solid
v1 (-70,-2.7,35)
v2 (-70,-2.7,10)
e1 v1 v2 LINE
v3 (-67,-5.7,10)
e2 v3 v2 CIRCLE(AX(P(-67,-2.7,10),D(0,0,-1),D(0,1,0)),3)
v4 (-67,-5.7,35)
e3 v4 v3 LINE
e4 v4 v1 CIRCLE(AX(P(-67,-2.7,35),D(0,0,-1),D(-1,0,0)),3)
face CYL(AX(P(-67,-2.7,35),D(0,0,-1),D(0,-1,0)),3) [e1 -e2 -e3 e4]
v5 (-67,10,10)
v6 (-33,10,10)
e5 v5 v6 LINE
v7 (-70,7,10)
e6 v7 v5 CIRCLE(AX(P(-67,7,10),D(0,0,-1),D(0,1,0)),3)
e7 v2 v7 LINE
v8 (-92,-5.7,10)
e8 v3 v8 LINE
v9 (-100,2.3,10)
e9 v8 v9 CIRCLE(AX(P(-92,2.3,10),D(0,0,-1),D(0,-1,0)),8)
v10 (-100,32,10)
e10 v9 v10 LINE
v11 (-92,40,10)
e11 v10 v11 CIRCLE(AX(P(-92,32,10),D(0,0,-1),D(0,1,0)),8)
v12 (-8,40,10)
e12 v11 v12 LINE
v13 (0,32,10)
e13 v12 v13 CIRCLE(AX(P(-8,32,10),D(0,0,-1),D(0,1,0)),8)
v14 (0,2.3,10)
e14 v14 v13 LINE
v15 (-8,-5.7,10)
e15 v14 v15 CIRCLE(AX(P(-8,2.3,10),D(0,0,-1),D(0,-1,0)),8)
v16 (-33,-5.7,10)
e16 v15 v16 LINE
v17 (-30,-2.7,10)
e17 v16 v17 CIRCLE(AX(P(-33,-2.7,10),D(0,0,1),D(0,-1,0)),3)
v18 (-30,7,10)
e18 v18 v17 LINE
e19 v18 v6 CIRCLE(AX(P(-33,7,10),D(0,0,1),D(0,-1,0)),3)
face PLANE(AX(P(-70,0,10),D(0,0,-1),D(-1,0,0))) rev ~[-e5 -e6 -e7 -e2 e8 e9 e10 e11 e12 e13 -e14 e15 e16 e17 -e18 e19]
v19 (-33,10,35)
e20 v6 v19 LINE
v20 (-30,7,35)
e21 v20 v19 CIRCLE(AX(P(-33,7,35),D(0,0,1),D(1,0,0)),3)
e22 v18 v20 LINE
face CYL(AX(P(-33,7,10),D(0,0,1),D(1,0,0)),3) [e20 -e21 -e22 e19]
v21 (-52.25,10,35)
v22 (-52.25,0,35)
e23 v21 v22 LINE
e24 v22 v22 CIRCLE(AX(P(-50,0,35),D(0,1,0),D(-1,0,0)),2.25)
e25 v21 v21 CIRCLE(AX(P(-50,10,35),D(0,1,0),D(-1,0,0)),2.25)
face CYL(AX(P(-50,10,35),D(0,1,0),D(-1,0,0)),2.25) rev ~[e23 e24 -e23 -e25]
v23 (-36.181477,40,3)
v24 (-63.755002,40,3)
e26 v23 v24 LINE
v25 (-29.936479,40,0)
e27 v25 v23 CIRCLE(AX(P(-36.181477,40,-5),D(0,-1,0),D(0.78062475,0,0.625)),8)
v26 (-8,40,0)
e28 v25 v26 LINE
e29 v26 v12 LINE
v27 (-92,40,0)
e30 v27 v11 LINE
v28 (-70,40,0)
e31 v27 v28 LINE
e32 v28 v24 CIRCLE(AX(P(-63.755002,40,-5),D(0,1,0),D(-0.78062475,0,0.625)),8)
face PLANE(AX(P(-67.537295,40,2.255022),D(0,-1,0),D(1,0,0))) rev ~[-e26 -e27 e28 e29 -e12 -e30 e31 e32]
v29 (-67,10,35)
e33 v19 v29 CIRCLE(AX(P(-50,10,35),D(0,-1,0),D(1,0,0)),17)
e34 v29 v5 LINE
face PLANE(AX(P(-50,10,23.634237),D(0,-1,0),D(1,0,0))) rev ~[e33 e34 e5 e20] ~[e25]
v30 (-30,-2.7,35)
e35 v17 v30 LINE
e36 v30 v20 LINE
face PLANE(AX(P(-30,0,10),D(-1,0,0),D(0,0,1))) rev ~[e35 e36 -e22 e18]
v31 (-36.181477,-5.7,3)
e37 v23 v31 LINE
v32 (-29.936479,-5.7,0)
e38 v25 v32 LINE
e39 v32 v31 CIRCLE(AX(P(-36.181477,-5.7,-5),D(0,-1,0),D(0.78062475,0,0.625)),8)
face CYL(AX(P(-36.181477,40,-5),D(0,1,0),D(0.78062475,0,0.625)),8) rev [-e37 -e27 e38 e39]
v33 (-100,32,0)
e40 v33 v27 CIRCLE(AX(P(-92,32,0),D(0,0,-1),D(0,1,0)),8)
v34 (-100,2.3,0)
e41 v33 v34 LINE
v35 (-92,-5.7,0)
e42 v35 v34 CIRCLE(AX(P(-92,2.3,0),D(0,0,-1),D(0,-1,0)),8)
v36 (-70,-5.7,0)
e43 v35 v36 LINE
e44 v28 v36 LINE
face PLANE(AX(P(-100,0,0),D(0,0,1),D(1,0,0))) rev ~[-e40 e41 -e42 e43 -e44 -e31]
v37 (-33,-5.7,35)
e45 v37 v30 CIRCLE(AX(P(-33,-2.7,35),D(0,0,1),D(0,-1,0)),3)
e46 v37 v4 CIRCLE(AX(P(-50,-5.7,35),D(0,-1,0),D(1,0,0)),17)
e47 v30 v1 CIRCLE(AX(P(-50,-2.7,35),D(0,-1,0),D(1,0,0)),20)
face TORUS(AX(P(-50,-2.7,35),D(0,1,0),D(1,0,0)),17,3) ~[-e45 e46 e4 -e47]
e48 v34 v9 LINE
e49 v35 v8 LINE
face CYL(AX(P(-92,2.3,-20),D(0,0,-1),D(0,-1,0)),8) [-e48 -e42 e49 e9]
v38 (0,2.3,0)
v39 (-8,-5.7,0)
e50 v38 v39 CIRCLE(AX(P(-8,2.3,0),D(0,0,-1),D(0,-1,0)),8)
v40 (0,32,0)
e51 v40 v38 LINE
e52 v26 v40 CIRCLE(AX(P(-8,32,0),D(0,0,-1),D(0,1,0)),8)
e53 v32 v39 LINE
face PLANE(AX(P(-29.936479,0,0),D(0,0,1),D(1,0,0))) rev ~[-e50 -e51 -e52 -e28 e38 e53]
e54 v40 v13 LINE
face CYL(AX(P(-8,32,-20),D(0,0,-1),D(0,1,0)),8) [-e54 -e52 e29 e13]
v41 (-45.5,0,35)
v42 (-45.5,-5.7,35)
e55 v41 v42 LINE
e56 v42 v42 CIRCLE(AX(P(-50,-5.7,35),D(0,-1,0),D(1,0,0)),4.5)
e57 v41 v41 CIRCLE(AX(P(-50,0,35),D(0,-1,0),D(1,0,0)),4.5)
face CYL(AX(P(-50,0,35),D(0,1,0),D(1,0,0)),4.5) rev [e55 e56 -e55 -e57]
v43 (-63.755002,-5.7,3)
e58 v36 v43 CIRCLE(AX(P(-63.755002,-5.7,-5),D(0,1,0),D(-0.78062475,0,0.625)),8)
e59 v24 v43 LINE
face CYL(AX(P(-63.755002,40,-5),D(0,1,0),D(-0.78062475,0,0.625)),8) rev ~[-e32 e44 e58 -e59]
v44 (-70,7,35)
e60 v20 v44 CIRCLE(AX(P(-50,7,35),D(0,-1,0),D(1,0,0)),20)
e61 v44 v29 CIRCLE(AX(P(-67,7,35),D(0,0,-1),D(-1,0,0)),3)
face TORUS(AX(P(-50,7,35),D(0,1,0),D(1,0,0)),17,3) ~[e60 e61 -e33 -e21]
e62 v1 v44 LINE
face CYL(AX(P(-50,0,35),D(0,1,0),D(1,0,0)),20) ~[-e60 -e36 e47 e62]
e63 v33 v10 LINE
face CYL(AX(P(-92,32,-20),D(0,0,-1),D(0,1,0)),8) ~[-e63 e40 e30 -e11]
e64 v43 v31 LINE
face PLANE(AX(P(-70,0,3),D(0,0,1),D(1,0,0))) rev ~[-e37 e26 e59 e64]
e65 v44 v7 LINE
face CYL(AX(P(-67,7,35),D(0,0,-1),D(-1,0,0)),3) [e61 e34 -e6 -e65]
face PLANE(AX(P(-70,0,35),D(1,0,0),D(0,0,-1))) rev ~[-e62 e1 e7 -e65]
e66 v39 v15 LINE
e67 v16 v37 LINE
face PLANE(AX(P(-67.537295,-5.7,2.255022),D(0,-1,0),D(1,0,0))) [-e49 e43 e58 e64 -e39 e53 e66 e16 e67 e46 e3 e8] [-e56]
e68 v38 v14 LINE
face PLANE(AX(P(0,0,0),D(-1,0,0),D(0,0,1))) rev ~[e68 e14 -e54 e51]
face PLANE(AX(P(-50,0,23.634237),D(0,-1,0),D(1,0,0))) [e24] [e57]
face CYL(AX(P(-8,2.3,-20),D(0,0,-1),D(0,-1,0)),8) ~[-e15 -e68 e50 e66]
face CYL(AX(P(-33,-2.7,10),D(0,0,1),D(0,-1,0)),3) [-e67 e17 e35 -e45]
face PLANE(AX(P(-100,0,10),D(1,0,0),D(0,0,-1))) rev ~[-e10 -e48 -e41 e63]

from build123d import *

# Parameters (mm, degrees)
F0_W          = 100
F0_H          = 40
F1_DEPTH      = 10
F3_DEPTH      = 10
F4_W          = 40.0635205954
F4_H          = 3
F5_DEPTH      = 40.001
F6_R          = 2.25
F7_DEPTH      = 10.001
F8_R          = 4.5
F10_DEPTH     = 5.7
F11_T1_DEPTH  = 45.7
F11_T3_DEPTH  = 45.7
F11_T5_DEPTH  = 50
F11_T7_DEPTH  = 50
F11_T9_DEPTH  = 50
F11_T11_DEPTH = 50
F12_R         = 3


# Not quite as in the source:
# - a fillet or chamfer that OpenCascade refuses, or shapes differently, is made with other operations: its cross-section is extruded or revolved along the edge and cut away or added
# - the program builds the solid bodies; features that only make, move or delete a surface that nothing else refers to are left out


with BuildPart() as f1:
    # F0 (on Top) → F1 (new body)
    with BuildSketch(Plane.XY):
        with Locations((-50, 20)):
            Rectangle(F0_W, F0_H)
    extrude(amount=F1_DEPTH)

    # F2 (on face) → F3 (join)
    with BuildSketch(Plane.XZ):
        with BuildLine():
            ThreePointArc((-30, 35), (-50, 55), (-70, 35))
            Line((-70, 35), (-70, 0))
            Line((-70, 0), (-30, 0))
            Line((-30, 0), (-30, 35))
        make_face()
    extrude(amount=-F3_DEPTH)

    # F4 (on face) → F5 (cut, through all)
    with BuildSketch(Plane.XZ):
        with Locations((-49.9682397023, 1.5)):
            Rectangle(F4_W, F4_H)
    extrude(amount=-F5_DEPTH, mode=Mode.SUBTRACT)

    # F6 (on face) → F7 (cut, through all)
    with BuildSketch(Plane(origin=(0, 10, 0), x_dir=(-1, 0, 0), z_dir=(0, 1, 0))):
        with Locations((50, 35)):
            Circle(F6_R)
    extrude(amount=-F7_DEPTH, mode=Mode.SUBTRACT)

    # F8 (on face) → F10 (join)
    with BuildSketch(Plane.XZ):
        with BuildLine():
            Line((-100, 10), (-100, 0))
            Line((-100, 0), (-70, 0))
            Line((-70, 0), (-70, 3))
            Line((-70, 3), (-29.9364794046, 3))
            Line((-29.9364794046, 3), (-29.9364794046, 0))
            Line((-29.9364794046, 0), (0, 0))
            Line((0, 0), (0, 10))
            Line((0, 10), (-30, 10))
            Line((-30, 10), (-30, 35))
            ThreePointArc((-30, 35), (-50, 55), (-70, 35))
            Line((-70, 35), (-70, 10))
            Line((-70, 10), (-100, 10))
        make_face()
        with Locations((-50, 35)):
            Circle(F8_R, mode=Mode.SUBTRACT)
    extrude(amount=F10_DEPTH)

    # F11: fillet of radius 8 on 8 edges, made by hand

    # F11_s2 → F11_t1 (join)
    with BuildSketch(Plane.XZ.offset(-40)):
        with BuildLine():
            ThreePointArc((-29.9364794046, 0), (-32.7173757878, 2.2111025509), (-36.181477403, 3))
            Line((-36.181477403, 3), (-29.9364794046, 3))
            Line((-29.9364794046, 3), (-29.9364794046, 0))
        make_face()
    extrude(amount=F11_T1_DEPTH)

    # F11_s4 → F11_t3 (join)
    with BuildSketch(Plane.XZ.offset(-40)):
        with BuildLine():
            ThreePointArc((-70, 0), (-67.2191036167, 2.2111025509), (-63.7550020016, 3))
            Line((-63.7550020016, 3), (-70, 3))
            Line((-70, 3), (-70, 0))
        make_face()
    extrude(amount=F11_T3_DEPTH)

    # F11_s6 → F11_t5 (cut)
    with BuildSketch(Plane.XY.offset(-20)):
        with BuildLine():
            ThreePointArc((-92, -5.7), (-97.6568542495, -3.3568542495), (-100, 2.3))
            Line((-100, 2.3), (-100, -5.7))
            Line((-100, -5.7), (-92, -5.7))
        make_face()
    extrude(amount=F11_T5_DEPTH, mode=Mode.SUBTRACT)

    # F11_s8 → F11_t7 (cut)
    with BuildSketch(Plane.XY.offset(-20)):
        with BuildLine():
            ThreePointArc((-8, -5.7), (-2.3431457505, -3.3568542495), (0, 2.3))
            Line((0, 2.3), (0, -5.7))
            Line((0, -5.7), (-8, -5.7))
        make_face()
    extrude(amount=F11_T7_DEPTH, mode=Mode.SUBTRACT)

    # F11_s10 → F11_t9 (cut)
    with BuildSketch(Plane.XY.offset(-20)):
        with BuildLine():
            ThreePointArc((-8, 40), (-2.3431457505, 37.6568542495), (0, 32))
            Line((0, 32), (0, 40))
            Line((0, 40), (-8, 40))
        make_face()
    extrude(amount=F11_T9_DEPTH, mode=Mode.SUBTRACT)

    # F11_s12 → F11_t11 (cut)
    with BuildSketch(Plane.XY.offset(-20)):
        with BuildLine():
            ThreePointArc((-92, 40), (-97.6568542495, 37.6568542495), (-100, 32))
            Line((-100, 32), (-100, 40))
            Line((-100, 40), (-92, 40))
        make_face()
    extrude(amount=F11_T11_DEPTH, mode=Mode.SUBTRACT)

    # F12
    f12_edges = [f1.edges().sort_by_distance(p)[0] for p in [
        (-30, -5.7, 22.5),
        (-50, -5.7, 55),
        (-50, 10, 55),
        (-70, -5.7, 22.5),
        (-30, 10, 22.5),
        (-70, 10, 22.5),
    ]]
    fillet(f12_edges, radius=F12_R)


solid = f1.part
